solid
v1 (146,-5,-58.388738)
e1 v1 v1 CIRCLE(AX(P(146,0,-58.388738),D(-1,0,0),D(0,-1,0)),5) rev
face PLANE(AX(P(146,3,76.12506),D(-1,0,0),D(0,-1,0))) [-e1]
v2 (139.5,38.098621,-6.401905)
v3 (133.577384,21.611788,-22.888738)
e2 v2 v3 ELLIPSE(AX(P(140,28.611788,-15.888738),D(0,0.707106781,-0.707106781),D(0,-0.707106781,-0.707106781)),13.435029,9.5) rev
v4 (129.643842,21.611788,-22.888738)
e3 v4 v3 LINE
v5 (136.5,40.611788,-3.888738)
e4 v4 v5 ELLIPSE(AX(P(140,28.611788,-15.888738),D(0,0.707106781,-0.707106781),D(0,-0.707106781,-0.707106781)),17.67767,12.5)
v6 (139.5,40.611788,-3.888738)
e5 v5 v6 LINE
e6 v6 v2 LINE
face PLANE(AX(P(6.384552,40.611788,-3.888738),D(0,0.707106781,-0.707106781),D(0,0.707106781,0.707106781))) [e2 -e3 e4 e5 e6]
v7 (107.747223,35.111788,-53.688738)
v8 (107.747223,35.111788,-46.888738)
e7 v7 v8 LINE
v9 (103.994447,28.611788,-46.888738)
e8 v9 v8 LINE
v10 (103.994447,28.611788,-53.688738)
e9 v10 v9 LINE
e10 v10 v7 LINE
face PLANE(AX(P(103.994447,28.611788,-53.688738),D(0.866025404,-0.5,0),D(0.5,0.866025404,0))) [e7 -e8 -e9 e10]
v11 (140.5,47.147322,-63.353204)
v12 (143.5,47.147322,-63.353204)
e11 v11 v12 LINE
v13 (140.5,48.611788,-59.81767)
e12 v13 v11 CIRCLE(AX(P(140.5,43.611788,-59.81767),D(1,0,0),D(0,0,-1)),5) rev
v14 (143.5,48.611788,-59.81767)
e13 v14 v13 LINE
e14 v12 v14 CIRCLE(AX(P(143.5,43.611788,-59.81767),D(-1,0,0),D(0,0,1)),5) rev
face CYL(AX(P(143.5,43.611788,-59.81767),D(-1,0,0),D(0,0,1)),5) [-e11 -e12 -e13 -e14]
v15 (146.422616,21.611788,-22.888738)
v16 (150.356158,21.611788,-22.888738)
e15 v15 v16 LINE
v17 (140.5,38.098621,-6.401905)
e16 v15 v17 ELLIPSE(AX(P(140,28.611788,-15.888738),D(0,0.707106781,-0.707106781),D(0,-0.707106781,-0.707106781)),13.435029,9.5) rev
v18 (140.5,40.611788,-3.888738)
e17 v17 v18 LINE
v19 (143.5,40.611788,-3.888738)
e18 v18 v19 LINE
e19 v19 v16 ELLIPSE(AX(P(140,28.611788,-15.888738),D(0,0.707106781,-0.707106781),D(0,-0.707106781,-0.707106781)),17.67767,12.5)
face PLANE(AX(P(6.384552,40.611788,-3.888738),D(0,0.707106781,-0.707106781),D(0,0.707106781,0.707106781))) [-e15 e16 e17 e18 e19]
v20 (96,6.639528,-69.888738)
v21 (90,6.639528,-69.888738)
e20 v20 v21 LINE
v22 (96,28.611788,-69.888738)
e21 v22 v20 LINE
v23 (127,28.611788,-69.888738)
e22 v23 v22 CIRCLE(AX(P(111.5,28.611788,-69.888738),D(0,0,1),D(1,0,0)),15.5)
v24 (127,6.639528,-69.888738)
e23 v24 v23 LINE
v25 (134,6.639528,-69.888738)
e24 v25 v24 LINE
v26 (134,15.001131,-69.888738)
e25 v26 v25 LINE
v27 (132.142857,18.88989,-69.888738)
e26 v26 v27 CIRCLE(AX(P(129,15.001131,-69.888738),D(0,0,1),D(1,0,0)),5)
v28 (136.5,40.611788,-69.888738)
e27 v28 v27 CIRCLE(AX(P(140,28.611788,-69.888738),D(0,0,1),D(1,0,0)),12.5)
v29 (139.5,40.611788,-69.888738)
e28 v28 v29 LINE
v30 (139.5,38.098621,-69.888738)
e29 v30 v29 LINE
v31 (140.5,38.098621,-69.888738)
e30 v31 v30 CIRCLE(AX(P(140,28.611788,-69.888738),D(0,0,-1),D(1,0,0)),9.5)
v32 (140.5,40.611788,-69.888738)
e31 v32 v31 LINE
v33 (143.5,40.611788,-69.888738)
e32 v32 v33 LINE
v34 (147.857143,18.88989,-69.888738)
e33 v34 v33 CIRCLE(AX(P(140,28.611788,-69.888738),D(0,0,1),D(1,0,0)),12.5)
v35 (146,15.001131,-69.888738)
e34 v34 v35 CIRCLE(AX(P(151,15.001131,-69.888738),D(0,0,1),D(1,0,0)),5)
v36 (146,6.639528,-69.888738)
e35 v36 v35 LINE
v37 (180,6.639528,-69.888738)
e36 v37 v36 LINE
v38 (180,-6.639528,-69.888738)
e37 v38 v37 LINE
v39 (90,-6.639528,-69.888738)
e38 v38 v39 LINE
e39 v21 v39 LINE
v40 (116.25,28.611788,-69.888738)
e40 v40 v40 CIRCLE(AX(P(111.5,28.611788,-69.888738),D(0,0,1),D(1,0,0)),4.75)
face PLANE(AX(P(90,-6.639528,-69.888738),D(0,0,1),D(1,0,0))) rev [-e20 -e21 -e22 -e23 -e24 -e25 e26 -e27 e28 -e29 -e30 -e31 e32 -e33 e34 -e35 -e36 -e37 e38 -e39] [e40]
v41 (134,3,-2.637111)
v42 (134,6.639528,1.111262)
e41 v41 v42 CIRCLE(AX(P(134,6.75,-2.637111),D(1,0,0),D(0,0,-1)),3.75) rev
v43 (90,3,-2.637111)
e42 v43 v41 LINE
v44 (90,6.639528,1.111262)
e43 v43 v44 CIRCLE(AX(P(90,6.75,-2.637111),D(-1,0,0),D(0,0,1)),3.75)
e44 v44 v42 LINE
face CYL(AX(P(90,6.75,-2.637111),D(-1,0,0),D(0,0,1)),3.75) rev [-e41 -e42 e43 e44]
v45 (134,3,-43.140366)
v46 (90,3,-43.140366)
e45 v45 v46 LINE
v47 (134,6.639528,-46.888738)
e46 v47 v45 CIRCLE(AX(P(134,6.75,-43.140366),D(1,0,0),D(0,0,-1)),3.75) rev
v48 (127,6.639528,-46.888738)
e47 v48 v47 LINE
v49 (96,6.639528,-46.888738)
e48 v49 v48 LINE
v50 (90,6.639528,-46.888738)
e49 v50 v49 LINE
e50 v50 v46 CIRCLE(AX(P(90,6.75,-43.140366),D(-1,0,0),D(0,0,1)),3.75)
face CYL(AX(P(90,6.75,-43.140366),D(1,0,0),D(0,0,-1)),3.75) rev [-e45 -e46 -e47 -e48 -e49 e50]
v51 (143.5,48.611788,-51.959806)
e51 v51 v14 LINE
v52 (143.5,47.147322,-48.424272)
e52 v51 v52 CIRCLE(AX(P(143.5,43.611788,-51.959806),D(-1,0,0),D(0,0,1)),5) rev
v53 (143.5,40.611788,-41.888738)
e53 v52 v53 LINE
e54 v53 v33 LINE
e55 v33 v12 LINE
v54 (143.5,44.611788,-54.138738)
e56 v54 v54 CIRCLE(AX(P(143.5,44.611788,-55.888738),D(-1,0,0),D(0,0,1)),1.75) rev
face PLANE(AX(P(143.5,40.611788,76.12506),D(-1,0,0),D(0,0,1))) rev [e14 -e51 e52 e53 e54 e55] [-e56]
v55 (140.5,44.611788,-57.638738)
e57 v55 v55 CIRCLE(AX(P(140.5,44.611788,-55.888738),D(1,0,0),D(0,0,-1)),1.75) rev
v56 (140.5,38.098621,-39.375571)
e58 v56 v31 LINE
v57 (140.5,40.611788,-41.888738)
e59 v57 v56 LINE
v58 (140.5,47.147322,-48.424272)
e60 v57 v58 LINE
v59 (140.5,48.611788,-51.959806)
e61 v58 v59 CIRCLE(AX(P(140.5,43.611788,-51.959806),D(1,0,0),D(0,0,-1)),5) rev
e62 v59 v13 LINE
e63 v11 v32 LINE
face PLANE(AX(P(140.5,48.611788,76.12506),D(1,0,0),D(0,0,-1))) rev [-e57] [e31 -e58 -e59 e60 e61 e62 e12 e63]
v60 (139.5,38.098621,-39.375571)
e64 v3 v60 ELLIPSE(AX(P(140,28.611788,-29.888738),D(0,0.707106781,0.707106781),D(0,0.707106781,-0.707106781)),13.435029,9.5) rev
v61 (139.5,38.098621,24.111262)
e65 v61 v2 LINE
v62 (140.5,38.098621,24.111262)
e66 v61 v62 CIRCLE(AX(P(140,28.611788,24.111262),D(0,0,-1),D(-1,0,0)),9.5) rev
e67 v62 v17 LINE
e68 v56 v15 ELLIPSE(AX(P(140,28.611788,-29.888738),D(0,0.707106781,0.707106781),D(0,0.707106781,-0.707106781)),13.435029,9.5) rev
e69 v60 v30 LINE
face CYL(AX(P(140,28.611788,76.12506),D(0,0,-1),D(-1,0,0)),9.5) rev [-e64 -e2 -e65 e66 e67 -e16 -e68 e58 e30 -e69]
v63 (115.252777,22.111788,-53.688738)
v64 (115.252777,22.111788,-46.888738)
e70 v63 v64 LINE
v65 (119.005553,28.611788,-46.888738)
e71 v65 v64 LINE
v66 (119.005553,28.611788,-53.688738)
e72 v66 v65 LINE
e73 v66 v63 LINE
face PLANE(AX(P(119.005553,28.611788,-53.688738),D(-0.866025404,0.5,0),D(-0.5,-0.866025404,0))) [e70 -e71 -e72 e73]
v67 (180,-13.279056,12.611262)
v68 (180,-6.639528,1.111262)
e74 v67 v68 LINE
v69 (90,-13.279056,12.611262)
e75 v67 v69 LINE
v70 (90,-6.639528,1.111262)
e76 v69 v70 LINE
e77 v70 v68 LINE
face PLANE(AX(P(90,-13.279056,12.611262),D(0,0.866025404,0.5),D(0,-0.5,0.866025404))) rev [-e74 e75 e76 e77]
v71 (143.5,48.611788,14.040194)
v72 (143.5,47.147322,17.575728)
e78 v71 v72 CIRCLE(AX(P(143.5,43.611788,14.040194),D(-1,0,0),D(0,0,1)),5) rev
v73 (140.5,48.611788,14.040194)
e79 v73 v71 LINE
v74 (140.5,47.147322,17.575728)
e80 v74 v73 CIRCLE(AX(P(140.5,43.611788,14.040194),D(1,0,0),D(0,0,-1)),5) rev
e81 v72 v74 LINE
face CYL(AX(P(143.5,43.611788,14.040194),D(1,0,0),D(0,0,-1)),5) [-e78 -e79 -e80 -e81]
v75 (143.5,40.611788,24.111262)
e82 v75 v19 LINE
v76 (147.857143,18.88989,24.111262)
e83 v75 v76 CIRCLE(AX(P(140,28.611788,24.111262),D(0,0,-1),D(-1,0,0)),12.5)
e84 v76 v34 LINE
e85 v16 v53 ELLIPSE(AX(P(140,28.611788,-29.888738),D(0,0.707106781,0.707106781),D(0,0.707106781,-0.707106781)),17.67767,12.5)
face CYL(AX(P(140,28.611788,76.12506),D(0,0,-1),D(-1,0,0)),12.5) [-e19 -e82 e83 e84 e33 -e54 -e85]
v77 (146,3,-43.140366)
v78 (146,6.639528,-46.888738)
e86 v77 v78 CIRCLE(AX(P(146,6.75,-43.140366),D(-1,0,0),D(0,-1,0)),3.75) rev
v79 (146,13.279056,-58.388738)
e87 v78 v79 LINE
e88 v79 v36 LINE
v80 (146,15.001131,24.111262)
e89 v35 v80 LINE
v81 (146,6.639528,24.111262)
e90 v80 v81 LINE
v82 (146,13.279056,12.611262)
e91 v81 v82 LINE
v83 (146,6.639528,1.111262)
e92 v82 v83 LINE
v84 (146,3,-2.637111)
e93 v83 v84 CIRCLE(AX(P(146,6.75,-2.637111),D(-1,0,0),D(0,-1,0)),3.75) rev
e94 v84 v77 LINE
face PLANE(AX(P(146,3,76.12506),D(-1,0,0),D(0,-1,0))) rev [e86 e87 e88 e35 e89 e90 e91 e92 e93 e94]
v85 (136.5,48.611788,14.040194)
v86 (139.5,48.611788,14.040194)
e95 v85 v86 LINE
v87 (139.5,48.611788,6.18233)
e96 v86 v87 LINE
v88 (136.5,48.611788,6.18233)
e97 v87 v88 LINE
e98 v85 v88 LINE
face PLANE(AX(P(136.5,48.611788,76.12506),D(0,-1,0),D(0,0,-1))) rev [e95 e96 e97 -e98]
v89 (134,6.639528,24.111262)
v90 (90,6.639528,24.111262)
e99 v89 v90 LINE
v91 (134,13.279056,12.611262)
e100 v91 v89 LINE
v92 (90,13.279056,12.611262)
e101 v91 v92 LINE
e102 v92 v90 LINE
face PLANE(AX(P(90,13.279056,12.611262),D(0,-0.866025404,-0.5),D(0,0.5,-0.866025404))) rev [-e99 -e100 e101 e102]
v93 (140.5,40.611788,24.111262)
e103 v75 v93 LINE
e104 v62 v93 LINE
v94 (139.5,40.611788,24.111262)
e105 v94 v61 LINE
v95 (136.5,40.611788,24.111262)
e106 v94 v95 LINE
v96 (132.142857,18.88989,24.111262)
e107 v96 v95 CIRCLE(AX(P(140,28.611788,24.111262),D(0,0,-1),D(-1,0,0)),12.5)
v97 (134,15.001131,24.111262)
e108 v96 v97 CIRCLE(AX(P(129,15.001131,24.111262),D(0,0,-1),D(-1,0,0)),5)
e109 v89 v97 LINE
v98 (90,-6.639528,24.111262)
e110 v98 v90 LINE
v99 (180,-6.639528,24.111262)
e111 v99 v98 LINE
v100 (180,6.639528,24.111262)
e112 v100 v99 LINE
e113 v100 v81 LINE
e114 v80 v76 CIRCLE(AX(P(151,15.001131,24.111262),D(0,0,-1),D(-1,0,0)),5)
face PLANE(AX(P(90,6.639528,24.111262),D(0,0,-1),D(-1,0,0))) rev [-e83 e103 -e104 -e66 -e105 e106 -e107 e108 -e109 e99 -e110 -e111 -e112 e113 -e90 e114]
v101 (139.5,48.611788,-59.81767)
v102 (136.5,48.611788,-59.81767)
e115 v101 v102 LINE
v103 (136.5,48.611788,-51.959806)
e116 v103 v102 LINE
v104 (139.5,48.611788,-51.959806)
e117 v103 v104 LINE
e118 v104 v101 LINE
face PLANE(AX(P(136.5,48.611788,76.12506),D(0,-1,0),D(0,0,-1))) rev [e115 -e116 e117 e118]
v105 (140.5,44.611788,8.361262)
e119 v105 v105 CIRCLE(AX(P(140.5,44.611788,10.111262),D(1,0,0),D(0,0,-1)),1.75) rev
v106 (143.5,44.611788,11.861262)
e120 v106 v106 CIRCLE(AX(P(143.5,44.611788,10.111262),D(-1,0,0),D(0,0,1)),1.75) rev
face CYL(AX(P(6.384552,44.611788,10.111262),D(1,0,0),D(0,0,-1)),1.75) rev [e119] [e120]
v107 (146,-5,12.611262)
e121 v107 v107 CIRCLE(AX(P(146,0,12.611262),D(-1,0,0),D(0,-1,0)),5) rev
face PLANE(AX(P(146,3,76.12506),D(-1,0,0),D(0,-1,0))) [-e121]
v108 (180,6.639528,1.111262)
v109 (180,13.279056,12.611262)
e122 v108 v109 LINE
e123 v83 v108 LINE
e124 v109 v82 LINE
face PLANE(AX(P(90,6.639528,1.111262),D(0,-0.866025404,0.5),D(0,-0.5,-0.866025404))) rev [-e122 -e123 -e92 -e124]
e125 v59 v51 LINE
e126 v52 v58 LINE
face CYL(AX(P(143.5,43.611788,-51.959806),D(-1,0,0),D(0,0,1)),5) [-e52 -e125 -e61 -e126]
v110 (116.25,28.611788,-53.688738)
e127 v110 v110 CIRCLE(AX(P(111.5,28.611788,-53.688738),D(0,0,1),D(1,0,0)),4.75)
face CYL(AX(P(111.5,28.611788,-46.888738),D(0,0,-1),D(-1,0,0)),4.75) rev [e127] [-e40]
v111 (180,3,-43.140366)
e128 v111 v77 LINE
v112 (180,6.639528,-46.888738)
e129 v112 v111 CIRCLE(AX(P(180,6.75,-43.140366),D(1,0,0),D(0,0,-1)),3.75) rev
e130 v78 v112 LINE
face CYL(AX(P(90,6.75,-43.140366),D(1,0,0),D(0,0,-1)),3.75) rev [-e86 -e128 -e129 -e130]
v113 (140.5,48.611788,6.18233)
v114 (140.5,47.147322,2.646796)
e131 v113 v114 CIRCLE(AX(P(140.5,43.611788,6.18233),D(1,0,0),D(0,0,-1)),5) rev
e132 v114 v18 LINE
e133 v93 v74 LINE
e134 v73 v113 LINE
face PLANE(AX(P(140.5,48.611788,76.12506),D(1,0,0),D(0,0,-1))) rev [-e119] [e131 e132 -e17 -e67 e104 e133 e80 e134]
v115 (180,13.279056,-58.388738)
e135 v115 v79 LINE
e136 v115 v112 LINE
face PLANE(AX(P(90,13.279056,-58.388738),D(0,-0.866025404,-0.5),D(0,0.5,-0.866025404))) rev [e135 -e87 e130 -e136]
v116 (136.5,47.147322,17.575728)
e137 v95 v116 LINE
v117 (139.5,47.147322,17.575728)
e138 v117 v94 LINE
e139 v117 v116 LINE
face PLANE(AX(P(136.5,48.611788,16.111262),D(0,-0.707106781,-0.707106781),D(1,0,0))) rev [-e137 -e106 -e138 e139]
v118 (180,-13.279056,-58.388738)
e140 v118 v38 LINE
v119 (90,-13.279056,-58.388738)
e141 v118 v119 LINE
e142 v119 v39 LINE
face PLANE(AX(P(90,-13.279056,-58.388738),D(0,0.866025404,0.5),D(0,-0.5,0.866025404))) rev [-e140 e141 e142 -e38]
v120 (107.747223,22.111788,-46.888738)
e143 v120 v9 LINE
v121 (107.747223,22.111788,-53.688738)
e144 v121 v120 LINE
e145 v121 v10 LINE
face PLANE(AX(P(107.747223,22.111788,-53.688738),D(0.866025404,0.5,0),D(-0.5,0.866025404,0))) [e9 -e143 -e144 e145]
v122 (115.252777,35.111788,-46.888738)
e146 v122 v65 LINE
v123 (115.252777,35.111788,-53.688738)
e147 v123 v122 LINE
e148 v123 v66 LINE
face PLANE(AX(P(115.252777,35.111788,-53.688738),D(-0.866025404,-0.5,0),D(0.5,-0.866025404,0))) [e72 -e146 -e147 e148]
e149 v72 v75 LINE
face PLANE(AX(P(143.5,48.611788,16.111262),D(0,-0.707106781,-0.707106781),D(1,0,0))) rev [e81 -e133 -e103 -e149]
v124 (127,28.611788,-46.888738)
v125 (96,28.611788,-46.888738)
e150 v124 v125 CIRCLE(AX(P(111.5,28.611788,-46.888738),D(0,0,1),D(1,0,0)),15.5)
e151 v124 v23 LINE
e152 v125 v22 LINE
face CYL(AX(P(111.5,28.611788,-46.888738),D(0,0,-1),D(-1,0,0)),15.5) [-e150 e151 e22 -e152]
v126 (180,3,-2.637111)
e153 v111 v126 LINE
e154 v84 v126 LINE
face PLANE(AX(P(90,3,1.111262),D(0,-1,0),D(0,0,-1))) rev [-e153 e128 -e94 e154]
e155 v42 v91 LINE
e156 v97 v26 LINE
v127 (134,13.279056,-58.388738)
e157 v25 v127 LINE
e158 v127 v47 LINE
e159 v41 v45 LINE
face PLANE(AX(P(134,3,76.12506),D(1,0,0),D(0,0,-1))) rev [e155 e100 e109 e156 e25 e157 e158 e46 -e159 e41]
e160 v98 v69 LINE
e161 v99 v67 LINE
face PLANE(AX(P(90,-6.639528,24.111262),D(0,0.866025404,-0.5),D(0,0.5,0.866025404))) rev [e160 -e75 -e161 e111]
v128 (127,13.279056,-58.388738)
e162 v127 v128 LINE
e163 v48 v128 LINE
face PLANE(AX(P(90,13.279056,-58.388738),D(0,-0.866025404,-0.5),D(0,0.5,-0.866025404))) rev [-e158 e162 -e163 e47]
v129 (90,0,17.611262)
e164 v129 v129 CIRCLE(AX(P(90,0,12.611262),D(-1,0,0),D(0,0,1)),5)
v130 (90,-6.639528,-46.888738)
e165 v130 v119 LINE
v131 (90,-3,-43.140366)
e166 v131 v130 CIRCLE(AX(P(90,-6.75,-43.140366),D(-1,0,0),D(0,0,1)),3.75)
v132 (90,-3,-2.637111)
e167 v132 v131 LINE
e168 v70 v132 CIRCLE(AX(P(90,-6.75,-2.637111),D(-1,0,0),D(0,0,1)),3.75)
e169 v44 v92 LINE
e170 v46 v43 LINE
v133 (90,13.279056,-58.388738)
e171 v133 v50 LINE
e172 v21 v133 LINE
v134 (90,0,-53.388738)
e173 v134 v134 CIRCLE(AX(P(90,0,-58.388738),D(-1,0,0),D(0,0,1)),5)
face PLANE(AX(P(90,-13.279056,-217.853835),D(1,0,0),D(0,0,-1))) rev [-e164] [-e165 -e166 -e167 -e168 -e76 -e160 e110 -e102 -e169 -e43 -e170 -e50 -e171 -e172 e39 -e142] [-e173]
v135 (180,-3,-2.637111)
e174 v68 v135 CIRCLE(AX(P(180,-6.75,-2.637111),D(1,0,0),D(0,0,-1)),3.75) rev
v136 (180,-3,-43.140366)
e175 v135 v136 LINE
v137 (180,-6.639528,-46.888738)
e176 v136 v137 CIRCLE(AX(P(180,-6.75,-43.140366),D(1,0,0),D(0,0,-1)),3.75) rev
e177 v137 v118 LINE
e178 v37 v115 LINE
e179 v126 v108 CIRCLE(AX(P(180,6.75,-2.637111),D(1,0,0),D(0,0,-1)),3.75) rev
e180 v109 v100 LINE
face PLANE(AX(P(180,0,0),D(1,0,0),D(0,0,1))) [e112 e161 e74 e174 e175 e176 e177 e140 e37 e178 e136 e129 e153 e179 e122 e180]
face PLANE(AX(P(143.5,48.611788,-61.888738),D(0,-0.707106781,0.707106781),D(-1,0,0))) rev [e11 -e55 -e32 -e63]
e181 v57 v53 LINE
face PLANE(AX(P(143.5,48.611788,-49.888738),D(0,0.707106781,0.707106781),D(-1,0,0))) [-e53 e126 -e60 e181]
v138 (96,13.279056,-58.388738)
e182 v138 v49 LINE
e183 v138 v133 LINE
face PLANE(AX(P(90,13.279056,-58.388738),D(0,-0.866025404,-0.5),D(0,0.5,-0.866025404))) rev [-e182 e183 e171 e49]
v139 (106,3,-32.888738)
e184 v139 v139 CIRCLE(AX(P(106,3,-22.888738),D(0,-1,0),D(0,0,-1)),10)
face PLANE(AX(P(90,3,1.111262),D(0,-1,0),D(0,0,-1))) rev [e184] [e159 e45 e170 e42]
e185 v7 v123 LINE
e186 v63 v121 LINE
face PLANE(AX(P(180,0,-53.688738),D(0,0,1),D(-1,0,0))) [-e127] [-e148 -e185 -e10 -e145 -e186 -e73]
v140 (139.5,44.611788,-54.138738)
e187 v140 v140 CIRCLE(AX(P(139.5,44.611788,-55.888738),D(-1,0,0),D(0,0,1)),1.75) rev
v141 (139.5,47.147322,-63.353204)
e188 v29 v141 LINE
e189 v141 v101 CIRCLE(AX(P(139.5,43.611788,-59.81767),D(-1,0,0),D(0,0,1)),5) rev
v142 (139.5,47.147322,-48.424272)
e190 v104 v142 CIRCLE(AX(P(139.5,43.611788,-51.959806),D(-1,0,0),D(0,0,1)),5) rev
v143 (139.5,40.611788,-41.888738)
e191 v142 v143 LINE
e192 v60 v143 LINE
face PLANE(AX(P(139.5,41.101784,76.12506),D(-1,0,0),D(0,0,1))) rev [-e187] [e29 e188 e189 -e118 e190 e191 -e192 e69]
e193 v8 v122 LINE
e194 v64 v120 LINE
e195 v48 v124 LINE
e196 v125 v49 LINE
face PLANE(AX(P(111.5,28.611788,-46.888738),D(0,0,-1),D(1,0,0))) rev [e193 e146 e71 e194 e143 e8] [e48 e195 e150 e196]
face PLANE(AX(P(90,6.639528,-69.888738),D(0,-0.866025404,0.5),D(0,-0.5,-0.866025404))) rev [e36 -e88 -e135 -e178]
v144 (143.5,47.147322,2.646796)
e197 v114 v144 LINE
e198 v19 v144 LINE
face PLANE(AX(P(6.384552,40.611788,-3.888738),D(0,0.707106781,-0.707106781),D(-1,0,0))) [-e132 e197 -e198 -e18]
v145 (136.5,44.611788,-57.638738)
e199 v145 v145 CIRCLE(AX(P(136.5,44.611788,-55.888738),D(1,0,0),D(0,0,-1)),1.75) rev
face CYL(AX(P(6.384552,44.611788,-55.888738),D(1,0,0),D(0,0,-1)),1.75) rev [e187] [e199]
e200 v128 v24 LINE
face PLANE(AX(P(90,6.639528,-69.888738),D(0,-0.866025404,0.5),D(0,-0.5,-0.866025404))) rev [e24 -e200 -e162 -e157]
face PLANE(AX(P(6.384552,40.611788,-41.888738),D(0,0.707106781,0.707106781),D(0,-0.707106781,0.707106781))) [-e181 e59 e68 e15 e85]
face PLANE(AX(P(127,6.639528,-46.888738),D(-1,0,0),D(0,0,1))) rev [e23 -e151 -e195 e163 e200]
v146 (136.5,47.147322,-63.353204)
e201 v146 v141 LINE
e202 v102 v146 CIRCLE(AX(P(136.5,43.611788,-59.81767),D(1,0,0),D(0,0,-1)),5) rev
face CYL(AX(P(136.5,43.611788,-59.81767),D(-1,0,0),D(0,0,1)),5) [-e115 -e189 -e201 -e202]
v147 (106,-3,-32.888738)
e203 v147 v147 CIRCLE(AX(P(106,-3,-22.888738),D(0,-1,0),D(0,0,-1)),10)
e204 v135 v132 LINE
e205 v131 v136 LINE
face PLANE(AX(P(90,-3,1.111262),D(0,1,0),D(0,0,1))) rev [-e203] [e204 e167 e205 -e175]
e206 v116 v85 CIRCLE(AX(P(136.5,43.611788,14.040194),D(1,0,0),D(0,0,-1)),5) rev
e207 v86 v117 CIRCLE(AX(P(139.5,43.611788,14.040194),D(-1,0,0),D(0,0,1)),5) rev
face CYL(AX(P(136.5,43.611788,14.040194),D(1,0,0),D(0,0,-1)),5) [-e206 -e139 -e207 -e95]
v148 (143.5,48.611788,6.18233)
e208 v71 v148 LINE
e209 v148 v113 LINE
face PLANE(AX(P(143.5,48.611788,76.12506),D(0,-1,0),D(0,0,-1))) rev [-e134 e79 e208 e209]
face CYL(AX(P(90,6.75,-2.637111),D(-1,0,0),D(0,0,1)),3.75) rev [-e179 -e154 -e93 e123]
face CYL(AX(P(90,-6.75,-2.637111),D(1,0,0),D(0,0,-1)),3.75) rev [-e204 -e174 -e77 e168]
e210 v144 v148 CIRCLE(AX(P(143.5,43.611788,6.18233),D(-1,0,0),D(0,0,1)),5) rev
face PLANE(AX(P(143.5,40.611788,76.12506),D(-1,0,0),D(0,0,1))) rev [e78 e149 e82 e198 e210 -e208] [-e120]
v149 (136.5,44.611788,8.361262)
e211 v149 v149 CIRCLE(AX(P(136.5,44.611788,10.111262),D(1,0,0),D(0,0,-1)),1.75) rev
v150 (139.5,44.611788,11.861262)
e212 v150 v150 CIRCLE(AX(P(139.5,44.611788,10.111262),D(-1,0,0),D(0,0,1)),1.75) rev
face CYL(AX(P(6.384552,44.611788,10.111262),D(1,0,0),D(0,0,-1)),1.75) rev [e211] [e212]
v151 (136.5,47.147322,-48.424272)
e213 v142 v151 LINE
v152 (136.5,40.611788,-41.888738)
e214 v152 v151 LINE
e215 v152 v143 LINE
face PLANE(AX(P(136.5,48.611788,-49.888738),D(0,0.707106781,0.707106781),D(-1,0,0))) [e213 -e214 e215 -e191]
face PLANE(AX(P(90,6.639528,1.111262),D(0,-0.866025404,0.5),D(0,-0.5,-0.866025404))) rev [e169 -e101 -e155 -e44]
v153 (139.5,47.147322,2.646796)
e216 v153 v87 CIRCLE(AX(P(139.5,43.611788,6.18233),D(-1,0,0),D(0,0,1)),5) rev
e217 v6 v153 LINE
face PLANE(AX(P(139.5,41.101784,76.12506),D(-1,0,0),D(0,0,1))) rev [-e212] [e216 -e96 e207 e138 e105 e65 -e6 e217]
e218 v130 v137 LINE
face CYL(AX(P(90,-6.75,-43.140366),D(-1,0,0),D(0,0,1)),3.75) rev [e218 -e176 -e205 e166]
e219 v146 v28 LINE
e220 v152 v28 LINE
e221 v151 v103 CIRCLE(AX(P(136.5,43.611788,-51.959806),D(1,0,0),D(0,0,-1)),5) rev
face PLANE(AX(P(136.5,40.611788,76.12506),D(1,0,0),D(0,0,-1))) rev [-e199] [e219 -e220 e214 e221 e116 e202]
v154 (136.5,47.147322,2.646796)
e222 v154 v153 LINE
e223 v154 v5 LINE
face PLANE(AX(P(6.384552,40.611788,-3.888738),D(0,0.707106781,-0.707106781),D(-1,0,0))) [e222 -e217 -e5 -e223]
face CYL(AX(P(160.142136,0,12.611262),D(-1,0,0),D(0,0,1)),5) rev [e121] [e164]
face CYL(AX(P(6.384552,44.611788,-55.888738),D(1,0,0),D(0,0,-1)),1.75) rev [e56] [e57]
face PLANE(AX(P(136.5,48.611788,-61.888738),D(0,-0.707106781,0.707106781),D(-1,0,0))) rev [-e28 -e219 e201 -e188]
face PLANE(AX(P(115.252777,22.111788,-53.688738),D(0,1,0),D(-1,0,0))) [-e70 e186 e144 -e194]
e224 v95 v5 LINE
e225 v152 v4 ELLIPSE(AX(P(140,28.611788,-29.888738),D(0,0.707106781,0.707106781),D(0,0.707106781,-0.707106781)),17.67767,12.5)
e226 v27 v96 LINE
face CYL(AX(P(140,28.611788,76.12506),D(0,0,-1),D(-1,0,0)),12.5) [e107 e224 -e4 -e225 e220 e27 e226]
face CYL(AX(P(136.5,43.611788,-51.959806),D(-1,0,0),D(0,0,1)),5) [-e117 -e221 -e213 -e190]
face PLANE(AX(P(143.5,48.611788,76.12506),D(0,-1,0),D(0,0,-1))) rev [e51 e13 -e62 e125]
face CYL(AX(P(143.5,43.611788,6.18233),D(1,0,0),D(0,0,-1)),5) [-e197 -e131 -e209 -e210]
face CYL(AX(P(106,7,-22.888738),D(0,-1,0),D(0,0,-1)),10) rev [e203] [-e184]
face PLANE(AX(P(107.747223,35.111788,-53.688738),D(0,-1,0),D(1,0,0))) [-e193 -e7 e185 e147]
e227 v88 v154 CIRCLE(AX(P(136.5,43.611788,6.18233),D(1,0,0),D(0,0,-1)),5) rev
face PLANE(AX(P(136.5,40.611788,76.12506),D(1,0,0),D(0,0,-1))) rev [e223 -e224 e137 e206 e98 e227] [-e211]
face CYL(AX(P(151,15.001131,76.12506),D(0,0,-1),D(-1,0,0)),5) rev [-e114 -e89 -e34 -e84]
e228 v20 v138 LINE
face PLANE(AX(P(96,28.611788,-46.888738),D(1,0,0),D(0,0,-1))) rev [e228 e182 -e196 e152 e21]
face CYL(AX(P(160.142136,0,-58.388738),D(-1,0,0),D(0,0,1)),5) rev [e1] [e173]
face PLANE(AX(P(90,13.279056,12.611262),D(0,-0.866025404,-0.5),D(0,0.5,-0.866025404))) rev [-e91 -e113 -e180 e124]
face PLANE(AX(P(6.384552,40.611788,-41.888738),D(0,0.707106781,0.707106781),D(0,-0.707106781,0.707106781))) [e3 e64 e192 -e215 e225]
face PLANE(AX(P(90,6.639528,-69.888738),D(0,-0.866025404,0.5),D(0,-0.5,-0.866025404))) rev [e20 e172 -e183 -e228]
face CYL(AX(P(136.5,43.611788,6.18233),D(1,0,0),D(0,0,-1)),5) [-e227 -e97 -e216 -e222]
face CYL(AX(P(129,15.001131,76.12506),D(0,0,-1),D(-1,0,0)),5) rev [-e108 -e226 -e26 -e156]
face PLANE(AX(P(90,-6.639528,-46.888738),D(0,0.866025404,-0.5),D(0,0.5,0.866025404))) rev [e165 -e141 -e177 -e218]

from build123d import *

# Parameters (mm, degrees)
BOSS_EXTRUDE1_DEPTH = 90
FILLET3_R           = 3.75
BOSS_EXTRUDE2_REACH = 132.814
FILLET4_R           = 5
SKETCH5_R           = 4.75
BOSS_EXTRUDE7_DEPTH = 23
CUT_EXTRUDE2_DEPTH  = 6.8
CUT_EXTRUDE3_REACH  = 125.885
SKETCH7_R           = 1.75
CHAMFER1_SIZE       = 8
FILLET5_R           = 5
CUT_EXTRUDE4_START  = -94
SKETCH8_W           = 125.822690829
SKETCH8_H           = 77.860904062
CUT_EXTRUDE4_DEPTH  = 94
SKETCH9_R           = 10
CUT_EXTRUDE5_DEPTH  = 10
SKETCH10_R          = 5
CUT_EXTRUDE6_DEPTH  = 56


# Read off the part's stored shape, not the designer's step: Mirror1
# Some blends are built 0.0001 mm under size
with BuildPart() as part:
    # Sketch2 → Boss-Extrude1 (new body)
    with BuildSketch(Plane(origin=(0, 0, 0), x_dir=(0, 0, -1), z_dir=(1, 0, 0))):
        Polygon((-1.111261719, 3), (46.888738281, 3), (46.888738281, 6.639528096), (58.388738281, 13.279056191), (69.888738281, 6.639528096), (69.888738281, -6.639528096), (58.388738281, -13.279056191), (46.888738281, -6.639528096), (46.888738281, -3), (-1.111261719, -3), (-1.111261719, -6.639528096), (-12.611261719, -13.279056191), (-24.111261719, -6.639528096), (-24.111261719, 6.639528096), (-12.611261719, 13.279056191), (-1.111261719, 6.639528096), align=None)
    extrude(amount=BOSS_EXTRUDE1_DEPTH)

    # Fillet3
    # the kernel refuses this fillet: 3.75 mm, written as the material it adds along each edge
    with BuildSketch(Plane(origin=(0, -3, 1.111261719), x_dir=(0, 0, -1), z_dir=(1, 0, 0)), Plane(origin=(0, 3, -46.888738281), x_dir=(0, 0, 1), z_dir=(1, 0, 0))) as fillet3_piece_1:
        with BuildLine():
            CenterArc((3.748372441, -3.75), FILLET3_R, 90, 88.311869402)
            Line((0, -3.639528096), (-0.074967449, -3.637318658))
            ThreePointArc((-0.074967449, -3.637318658), (-0.075, -1.819764048), (-0.075, 0))
            Line((-0.075, 0), (0, 0.075))
            Line((0, 0.075), (3.748372441, 0.075))
            Line((3.748372441, 0.075), (3.748372441, 0))
        make_face()
    extrude(amount=90)
    with BuildSketch(Plane(origin=(0, -3, -46.888738281), x_dir=(0, -1, 0), z_dir=(1, 0, 0))) as fillet3_piece_2:
        with BuildLine():
            CenterArc((3.75, -3.748372441), FILLET3_R, 91.688130598, 88.311869402)
            Line((0, -3.748372441), (-0.075, -3.748372441))
            Line((-0.075, -3.748372441), (-0.075, 0))
            Line((-0.075, 0), (0, 0.075))
            ThreePointArc((0, 0.075), (1.819764048, 0.075), (3.637318658, 0.074967449))
            Line((3.637318658, 0.074967449), (3.639528096, 0))
        make_face()
    extrude(amount=90)
    with BuildSketch(Plane(origin=(0, 3, 1.111261719), x_dir=(0, 0, -1), z_dir=(1, 0, 0))) as fillet3_piece_3:
        with BuildLine():
            CenterArc((3.748372441, 3.75), FILLET3_R, 181.688130598, 88.311869402)
            Line((0, 3.639528096), (-0.074967449, 3.637318658))
            ThreePointArc((-0.074967449, 3.637318658), (-0.075, 1.819764048), (-0.075, 0))
            Line((-0.075, 0), (0, -0.075))
            Line((0, -0.075), (3.748372441, -0.075))
            Line((3.748372441, -0.075), (3.748372441, 0))
        make_face()
    extrude(amount=90)

    # Boss-Extrude2: up to this face of the body (flat: up to its plane)
    boss_extrude2_end = Plane(part.part.faces().sort_by_distance((45, 0, 24.111261719))[0])
    # Sketch4 → Boss-Extrude2 (add, up to the picked face)
    with BuildSketch(Plane(origin=(0, 0, -69.888738281), x_dir=(-1, 0, 0), z_dir=(0, 0, -1)), mode=Mode.PRIVATE) as boss_extrude2_sk1:
        with BuildLine():
            Line((-46, 3), (-46, 17.64593212))
            ThreePointArc((-46, 17.64593212), (-52.426589902, 29.964512656), (-43.5, 40.611788219))
            Line((-43.5, 40.611788219), (-43.5, 48.611788219))
            Line((-43.5, 48.611788219), (-40.5, 48.611788219))
            Line((-40.5, 48.611788219), (-40.5, 41.101784216))
            Line((-40.5, 41.101784216), (-40.5, 38.0986212))
            ThreePointArc((-40.5, 38.0986212), (-40, 19.111788219), (-39.5, 38.0986212))
            Line((-39.5, 38.0986212), (-39.5, 41.101784216))
            Line((-39.5, 41.101784216), (-39.5, 48.611788219))
            Line((-39.5, 48.611788219), (-36.5, 48.611788219))
            Line((-36.5, 48.611788219), (-36.5, 40.611788219))
            ThreePointArc((-36.5, 40.611788219), (-27.573410098, 29.964512656), (-34, 17.64593212))
            Line((-34, 17.64593212), (-34, 3))
            Line((-34, 3), (-46, 3))
        make_face()
    boss_extrude2_tool1 = split(extrude(boss_extrude2_sk1.sketch, amount=-BOSS_EXTRUDE2_REACH, mode=Mode.PRIVATE), bisect_by=boss_extrude2_end, keep=Keep.BOTH, mode=Mode.PRIVATE)
    add(boss_extrude2_tool1.solids().sort_by(Axis((45.479862, 10.322966, -69.888738), (0, 0, 1)))[0])

    # Fillet4
    fillet4_edges = [part.edges().sort_by_distance(p)[0] for p in [
        (34, 17.64593212, -22.888738281),
        (46, 17.64593212, -22.888738281),
    ]]
    fillet(fillet4_edges, radius=FILLET4_R)

    # Sketch5 → Boss-Extrude7 (add)
    with BuildSketch(Plane(origin=(0, 0, -69.888738281), x_dir=(-1, 0, 0), z_dir=(0, 0, -1))):
        with BuildLine():
            Line((-84, 28.611788219), (-84, 6.639528096))
            Line((-84, 6.639528096), (-53, 6.639528096))
            Line((-53, 6.639528096), (-53, 28.611788219))
            ThreePointArc((-53, 28.611788219), (-68.5, 44.111788219), (-84, 28.611788219))
        make_face()
        with Locations((-68.5, 28.611788219)):
            Circle(SKETCH5_R, mode=Mode.SUBTRACT)
    extrude(amount=-BOSS_EXTRUDE7_DEPTH)

    # Sketch6 → Cut-Extrude2 (cut)
    with BuildSketch(Plane.XY.offset(-46.888738281)):
        Polygon((60.994446501, 28.611788219), (64.74722325, 22.111788219), (72.25277675, 22.111788219), (76.005553499, 28.611788219), (72.25277675, 35.111788219), (64.74722325, 35.111788219), align=None)
    extrude(amount=-CUT_EXTRUDE2_DEPTH, mode=Mode.SUBTRACT)

    # Cut-Extrude3: up to this face of the body (flat: up to its plane)
    cut_extrude3_end = Plane(part.part.faces().sort_by_distance((53, 19.187065128, -58.388738281))[0])
    # Sketch7 → Cut-Extrude3 (cut, up to the picked face)
    with BuildSketch(Plane.ZY, mode=Mode.PRIVATE) as cut_extrude3_sk1:
        with Locations((10.111261719, 44.611788219)):
            Circle(SKETCH7_R)
    cut_extrude3_tool1 = split(extrude(cut_extrude3_sk1.sketch, amount=-CUT_EXTRUDE3_REACH, mode=Mode.PRIVATE), bisect_by=cut_extrude3_end, keep=Keep.BOTH, mode=Mode.PRIVATE)
    # Sketch7 → Cut-Extrude3 (cut, up to the picked face)
    with BuildSketch(Plane.ZY, mode=Mode.PRIVATE) as cut_extrude3_sk2:
        with Locations((-55.888738281, 44.611788219)):
            Circle(SKETCH7_R)
    cut_extrude3_tool2 = split(extrude(cut_extrude3_sk2.sketch, amount=-CUT_EXTRUDE3_REACH, mode=Mode.PRIVATE), bisect_by=cut_extrude3_end, keep=Keep.BOTH, mode=Mode.PRIVATE)
    # Sketch7 → Cut-Extrude3 (cut, up to the picked face)
    with BuildSketch(Plane.ZY, mode=Mode.PRIVATE) as cut_extrude3_sk3:
        Polygon((-41.888738281, 40.611788219), (-22.888738281, 21.611788219), (-3.888738281, 40.611788219), (-3.888738281, 48.611788219), (-41.888738281, 48.611788219), align=None)
    cut_extrude3_tool3 = split(extrude(cut_extrude3_sk3.sketch, amount=-CUT_EXTRUDE3_REACH, mode=Mode.PRIVATE), bisect_by=cut_extrude3_end, keep=Keep.BOTH, mode=Mode.PRIVATE)
    add(cut_extrude3_tool1.solids().sort_by(Axis((0, 44.611788, 10.111262), (1, 0, 0)))[0], mode=Mode.SUBTRACT)
    add(cut_extrude3_tool2.solids().sort_by(Axis((0, 44.611788, -55.888738), (1, 0, 0)))[0], mode=Mode.SUBTRACT)
    add(cut_extrude3_tool3.solids().sort_by(Axis((0, 39.002264, -22.888738), (1, 0, 0)))[0], mode=Mode.SUBTRACT)

    # Chamfer1
    chamfer1_edges = [part.edges().sort_by_distance(p)[0] for p in [
        (42, 48.611788219, -41.888738281),
        (42, 48.611788219, -69.888738281),
        (42, 48.611788219, -3.888738281),
        (42, 48.611788219, 24.111261719),
        (38, 48.611788219, -41.888738281),
        (38, 48.611788219, -69.888738281),
        (38, 48.611788219, -3.888738281),
        (38, 48.611788219, 24.111261719),
    ]]
    chamfer(chamfer1_edges, length=CHAMFER1_SIZE - 0.0001)  # a hair under: the kernel refuses the full size

    # Fillet5
    fillet5_edges = [part.edges().sort_by_distance(p)[0] for p in [
        (42, 48.611788219, -49.888638281),
        (42, 48.611788219, -61.888838281),
        (38, 48.611788219, -49.888638281),
        (38, 48.611788219, -61.888838281),
        (42, 48.611788219, 16.111361719),
        (42, 48.611788219, 4.111161719),
        (38, 48.611788219, 16.111361719),
        (38, 48.611788219, 4.111161719),
    ]]
    fillet(fillet5_edges, radius=FILLET5_R)

    # Mirror1: part across plane


with BuildPart() as part_1:
    add(part.part)
    add(part.part.mirror(Plane.ZY.offset(-90)))

    # Sketch8 → Cut-Extrude4 (cut)
    with BuildSketch(Plane.XY.offset(24.111261719).offset(CUT_EXTRUDE4_START)):
        with Locations((27.088654585, 25.65139584)):
            Rectangle(SKETCH8_W, SKETCH8_H)
    extrude(amount=CUT_EXTRUDE4_DEPTH, mode=Mode.SUBTRACT)

    # Sketch9 → Cut-Extrude5 (cut)
    with BuildSketch(Plane.XZ.offset(3)):
        with Locations(Location((106, -22.888738281, 0), (0, 0, 270))):
            Circle(SKETCH9_R)
    extrude(amount=-CUT_EXTRUDE5_DEPTH, mode=Mode.SUBTRACT)

    # Sketch10 → Cut-Extrude6 (cut)
    with BuildSketch(Plane.ZY.offset(-90)):
        with Locations((12.611261719, 0)):
            Circle(SKETCH10_R)
        with Locations((-58.388738281, 0)):
            Circle(SKETCH10_R)
    extrude(amount=-CUT_EXTRUDE6_DEPTH, mode=Mode.SUBTRACT)


solid = part_1.part
